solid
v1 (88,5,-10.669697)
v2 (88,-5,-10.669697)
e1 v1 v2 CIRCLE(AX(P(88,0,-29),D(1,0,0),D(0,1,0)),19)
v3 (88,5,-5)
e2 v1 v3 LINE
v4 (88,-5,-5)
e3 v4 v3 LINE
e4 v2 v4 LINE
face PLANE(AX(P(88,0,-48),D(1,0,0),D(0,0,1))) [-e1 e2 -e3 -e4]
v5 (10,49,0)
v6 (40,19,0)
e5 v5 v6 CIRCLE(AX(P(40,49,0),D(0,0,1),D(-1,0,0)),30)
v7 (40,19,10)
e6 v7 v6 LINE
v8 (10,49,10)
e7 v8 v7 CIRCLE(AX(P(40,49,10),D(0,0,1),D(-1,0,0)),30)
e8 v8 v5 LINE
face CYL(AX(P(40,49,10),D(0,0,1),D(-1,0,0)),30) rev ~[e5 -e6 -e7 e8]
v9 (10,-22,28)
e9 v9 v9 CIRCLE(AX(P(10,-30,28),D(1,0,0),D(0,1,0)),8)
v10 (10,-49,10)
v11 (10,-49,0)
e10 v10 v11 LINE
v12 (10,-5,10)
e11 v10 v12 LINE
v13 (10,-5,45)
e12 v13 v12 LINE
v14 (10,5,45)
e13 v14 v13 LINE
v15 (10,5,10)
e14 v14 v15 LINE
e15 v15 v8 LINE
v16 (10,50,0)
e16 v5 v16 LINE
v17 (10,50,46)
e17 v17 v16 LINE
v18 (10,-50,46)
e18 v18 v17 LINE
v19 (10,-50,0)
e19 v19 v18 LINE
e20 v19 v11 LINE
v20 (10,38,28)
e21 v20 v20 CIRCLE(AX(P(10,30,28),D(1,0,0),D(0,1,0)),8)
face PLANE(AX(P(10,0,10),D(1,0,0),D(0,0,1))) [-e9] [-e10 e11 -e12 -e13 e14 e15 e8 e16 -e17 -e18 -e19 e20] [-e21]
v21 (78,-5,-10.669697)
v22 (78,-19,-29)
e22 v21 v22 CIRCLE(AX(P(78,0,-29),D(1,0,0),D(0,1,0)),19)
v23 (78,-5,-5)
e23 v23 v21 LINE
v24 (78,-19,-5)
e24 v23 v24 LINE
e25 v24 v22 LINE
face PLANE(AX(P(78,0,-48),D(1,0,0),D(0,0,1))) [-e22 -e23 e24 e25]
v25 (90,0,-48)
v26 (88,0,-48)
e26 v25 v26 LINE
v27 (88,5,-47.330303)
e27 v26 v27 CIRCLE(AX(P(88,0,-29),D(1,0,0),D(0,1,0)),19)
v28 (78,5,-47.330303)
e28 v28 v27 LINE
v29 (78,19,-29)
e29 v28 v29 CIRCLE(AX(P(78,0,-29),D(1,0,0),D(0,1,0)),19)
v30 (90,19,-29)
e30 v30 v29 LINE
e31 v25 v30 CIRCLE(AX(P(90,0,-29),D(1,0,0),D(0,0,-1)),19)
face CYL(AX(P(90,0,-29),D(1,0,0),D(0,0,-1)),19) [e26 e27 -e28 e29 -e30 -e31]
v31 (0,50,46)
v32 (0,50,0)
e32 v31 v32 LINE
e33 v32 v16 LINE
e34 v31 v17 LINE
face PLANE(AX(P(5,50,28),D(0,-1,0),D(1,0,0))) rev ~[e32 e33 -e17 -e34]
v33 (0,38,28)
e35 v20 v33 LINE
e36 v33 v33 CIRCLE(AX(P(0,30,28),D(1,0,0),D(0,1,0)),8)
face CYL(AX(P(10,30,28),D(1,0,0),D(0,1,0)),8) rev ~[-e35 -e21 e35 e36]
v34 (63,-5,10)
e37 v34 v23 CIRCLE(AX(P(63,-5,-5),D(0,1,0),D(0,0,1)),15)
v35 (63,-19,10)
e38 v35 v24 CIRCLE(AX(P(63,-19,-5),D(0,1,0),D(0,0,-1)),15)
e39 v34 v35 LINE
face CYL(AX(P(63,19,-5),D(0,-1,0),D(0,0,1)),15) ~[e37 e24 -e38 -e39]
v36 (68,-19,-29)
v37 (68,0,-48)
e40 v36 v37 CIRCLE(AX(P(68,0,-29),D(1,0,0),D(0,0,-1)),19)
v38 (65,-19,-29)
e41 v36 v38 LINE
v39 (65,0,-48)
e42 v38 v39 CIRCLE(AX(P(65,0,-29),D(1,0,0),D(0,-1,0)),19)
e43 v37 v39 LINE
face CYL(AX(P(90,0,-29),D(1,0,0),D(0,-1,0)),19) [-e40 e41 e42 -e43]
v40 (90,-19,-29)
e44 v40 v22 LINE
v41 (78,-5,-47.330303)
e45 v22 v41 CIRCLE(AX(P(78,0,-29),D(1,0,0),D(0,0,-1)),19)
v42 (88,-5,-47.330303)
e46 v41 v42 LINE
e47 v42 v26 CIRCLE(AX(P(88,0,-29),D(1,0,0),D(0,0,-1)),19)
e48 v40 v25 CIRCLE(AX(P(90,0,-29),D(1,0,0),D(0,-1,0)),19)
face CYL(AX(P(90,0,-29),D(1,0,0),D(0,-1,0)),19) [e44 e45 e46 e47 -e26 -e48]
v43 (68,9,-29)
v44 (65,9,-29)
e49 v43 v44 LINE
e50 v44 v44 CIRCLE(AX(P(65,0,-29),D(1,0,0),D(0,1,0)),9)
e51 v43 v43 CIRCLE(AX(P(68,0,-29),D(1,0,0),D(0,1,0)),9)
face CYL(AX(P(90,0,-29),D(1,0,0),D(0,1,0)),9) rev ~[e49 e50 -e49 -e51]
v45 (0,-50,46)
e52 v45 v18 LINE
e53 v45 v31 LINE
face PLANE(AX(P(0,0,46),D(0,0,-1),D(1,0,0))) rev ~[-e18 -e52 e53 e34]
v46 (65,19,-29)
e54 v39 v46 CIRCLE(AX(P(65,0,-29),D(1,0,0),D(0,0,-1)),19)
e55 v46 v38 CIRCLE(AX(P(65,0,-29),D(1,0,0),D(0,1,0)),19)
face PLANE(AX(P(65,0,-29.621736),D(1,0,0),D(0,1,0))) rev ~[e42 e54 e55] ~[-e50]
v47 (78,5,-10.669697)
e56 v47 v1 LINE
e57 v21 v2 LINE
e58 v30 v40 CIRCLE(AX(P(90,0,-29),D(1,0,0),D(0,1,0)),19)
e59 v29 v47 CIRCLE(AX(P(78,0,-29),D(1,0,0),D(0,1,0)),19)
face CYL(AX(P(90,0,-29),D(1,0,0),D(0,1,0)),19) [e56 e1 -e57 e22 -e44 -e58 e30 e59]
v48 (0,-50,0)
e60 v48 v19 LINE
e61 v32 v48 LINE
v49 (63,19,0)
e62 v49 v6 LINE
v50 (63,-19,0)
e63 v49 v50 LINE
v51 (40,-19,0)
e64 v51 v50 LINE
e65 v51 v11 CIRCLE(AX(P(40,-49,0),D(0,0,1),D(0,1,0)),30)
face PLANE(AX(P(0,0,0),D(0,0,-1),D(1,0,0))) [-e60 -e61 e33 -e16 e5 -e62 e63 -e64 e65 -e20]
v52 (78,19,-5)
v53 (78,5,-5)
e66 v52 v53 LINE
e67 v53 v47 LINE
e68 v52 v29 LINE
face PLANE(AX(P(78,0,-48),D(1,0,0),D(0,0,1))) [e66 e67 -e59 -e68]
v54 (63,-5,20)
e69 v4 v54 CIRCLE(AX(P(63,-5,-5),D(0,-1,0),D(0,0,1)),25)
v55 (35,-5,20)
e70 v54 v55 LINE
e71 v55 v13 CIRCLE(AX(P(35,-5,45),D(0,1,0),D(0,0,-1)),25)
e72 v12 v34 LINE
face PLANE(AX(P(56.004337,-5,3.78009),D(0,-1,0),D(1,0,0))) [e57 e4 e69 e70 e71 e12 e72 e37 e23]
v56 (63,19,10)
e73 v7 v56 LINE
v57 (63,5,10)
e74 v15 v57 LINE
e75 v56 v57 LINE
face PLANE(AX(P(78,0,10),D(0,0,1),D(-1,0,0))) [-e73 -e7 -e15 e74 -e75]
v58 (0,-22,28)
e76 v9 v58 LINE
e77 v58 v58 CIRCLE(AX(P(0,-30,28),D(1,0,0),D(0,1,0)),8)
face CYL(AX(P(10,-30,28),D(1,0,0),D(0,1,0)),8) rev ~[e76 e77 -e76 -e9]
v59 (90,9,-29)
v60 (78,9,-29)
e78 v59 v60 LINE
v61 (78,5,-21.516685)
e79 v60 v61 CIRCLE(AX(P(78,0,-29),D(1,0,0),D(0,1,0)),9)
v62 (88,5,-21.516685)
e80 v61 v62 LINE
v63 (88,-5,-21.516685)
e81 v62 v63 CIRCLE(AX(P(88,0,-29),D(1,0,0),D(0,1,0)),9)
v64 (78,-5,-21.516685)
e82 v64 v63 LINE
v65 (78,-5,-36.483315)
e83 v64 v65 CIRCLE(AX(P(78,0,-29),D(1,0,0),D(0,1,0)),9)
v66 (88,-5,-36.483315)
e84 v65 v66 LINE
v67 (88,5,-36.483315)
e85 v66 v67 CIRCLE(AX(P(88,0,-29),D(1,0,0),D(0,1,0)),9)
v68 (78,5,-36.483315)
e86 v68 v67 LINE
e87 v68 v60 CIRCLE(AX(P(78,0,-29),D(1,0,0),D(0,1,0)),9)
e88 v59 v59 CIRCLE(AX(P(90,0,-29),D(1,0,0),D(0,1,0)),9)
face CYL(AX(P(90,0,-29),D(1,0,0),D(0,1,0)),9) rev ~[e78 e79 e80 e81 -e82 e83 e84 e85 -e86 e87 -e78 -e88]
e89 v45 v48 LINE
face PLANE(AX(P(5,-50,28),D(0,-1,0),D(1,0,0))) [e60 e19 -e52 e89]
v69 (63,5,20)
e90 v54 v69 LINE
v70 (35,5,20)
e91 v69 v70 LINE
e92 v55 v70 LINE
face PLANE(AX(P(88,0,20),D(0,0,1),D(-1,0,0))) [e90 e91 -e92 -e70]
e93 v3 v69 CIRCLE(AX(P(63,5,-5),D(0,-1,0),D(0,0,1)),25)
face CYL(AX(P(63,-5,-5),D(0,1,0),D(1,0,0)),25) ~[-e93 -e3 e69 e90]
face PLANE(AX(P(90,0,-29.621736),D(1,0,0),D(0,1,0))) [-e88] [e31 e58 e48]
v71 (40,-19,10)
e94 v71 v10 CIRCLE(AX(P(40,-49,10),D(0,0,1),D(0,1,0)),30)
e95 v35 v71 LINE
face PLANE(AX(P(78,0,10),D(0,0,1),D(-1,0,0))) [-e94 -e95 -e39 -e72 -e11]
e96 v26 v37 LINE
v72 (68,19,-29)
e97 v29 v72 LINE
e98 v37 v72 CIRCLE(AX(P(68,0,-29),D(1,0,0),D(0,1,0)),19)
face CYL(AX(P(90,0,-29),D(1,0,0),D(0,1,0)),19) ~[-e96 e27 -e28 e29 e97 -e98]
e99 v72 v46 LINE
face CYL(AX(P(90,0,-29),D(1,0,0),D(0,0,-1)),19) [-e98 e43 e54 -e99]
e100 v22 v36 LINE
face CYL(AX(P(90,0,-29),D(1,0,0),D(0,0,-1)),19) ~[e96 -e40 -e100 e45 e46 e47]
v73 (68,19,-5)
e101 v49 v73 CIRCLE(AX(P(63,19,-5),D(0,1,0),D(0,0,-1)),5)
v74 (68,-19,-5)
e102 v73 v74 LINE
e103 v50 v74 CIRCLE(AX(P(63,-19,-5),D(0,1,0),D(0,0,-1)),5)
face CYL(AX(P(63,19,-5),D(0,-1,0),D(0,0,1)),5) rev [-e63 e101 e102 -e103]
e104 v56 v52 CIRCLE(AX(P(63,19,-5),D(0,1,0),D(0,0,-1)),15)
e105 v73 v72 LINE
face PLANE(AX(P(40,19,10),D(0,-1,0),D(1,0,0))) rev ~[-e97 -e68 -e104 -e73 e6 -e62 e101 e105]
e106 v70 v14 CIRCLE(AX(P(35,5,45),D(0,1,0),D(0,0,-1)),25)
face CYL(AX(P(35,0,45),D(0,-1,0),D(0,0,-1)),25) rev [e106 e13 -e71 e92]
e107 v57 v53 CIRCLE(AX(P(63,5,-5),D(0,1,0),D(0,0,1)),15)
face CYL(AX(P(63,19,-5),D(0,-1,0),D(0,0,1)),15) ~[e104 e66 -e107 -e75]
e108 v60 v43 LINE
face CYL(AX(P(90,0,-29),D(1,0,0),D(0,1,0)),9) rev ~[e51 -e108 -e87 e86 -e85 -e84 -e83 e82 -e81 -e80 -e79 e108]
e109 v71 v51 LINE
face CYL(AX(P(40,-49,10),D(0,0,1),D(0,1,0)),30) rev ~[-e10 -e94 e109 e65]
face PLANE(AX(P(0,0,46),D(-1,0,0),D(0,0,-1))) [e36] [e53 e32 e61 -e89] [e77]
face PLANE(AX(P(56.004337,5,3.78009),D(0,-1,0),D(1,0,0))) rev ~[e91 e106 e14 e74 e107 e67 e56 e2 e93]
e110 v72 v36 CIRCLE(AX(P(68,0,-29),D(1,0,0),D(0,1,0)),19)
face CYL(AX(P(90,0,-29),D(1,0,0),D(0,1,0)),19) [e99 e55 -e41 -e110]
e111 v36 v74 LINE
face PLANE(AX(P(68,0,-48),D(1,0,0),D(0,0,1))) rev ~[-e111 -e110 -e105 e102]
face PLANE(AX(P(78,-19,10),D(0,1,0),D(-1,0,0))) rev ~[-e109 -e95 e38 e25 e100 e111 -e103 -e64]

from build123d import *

# Parameters (mm, degrees)
F0_W      = 10
F0_H      = 36
F0_H_2    = 10
F0_W_2    = 58
F0_H_3    = 48
F1_DEPTH  = 50
F4_DEPTH  = 58.001
F2_R      = 8
F5_DEPTH  = 25
F6_R      = 15
F7_R      = 5
F9_DEPTH  = 5
F10_R     = 25
F13_DEPTH = 25
F12_R     = 9
F14_DEPTH = 25
F15_DEPTH = 25


# Not quite as in the source:
# - after a boolean that leaves OpenCascade's solid faulty, fix() repairs it


with BuildPart() as f1:
    # F0 (on Front) → F1 (new body, symmetric)
    with BuildSketch(Plane.XZ):
        with Locations((5, 28)):
            Rectangle(F0_W, F0_H)
        with Locations((5, 5)):
            Rectangle(F0_W, F0_H_2)
        with Locations((39, 5)):
            Rectangle(F0_W_2, F0_H_2)
        with Locations((73, 5)):
            Rectangle(F0_W, F0_H_2)
        with Locations((73, -24)):
            Rectangle(F0_W, F0_H_3)
    extrude(amount=F1_DEPTH, both=True)

    # F3 (on face) → F4 (cut, through all)
    with BuildSketch(Plane.XY.offset(10)):
        with BuildLine():
            Line((78, -19), (40, -19))
            ThreePointArc((40, -19), (18.7867965644, -27.7867965644), (10, -49))
            Line((10, -49), (10, -50))
            Line((10, -50), (78, -50))
            Line((78, -50), (78, -19))
        make_face()
        with BuildLine():
            ThreePointArc((10, 49), (18.7867965644, 27.7867965644), (40, 19))
            Line((40, 19), (78, 19))
            Line((78, 19), (78, 50))
            Line((78, 50), (10, 50))
            Line((10, 50), (10, 49))
        make_face()
    extrude(amount=-F4_DEPTH, mode=Mode.SUBTRACT)

    # F2 (on face) → F5 (cut)
    with BuildSketch(Plane.YZ.offset(10)):
        with Locations((30, 28)):
            Circle(F2_R)
        with Locations((-30, 28)):
            Circle(F2_R)
    extrude(amount=-F5_DEPTH, mode=Mode.SUBTRACT)

    # F6
    f6_edges = [f1.edges().sort_by_distance(p)[0] for p in [
        (78, 0, 10),
    ]]
    fillet(f6_edges, radius=F6_R)

    # F7
    f7_edges = [f1.edges().sort_by_distance(p)[0] for p in [
        (68, 0, 0),
    ]]
    fillet(f7_edges, radius=F7_R)

    # F8 (on Front) → F9 (join, symmetric)
    with BuildSketch(Plane.XZ):
        with BuildLine():
            ThreePointArc((35, 20), (17.3223304703, 27.3223304703), (10, 45))
            Line((10, 45), (10, 10))
            Line((10, 10), (40, 10))
            Line((40, 10), (63, 10))
            ThreePointArc((63, 10), (73.6066017178, 5.6066017178), (78, -5))
            Line((78, -5), (78, -48))
            Line((78, -48), (88, -48))
            Line((88, -48), (88, 20))
            Line((88, 20), (35, 20))
        make_face()
    extrude(amount=F9_DEPTH, both=True)

    # F10
    f10_edges = [f1.edges().sort_by_distance(p)[0] for p in [
        (88, 0, 20),
    ]]
    fillet(f10_edges, radius=F10_R)

    # F12 (on offset) → F13 (cut)
    with BuildSketch(Plane.YZ.offset(90)):
        with BuildLine():
            ThreePointArc((0, -48), (-13.4350288425, -42.4350288425), (-19, -29))
            Line((-19, -29), (-19, -48))
            Line((-19, -48), (-5, -48))
            Line((-5, -48), (0, -48))
        make_face()
        with BuildLine():
            Line((19, -48), (19, -29))
            ThreePointArc((19, -29), (13.4350288425, -42.4350288425), (0, -48))
            Line((0, -48), (5, -48))
            Line((5, -48), (19, -48))
        make_face()
    extrude(amount=-F13_DEPTH, mode=Mode.SUBTRACT)

    # F12 (on offset) → F14 (join)
    with BuildSketch(Plane.YZ.offset(90)):
        with BuildLine():
            ThreePointArc((0, -48), (13.4350288425, -42.4350288425), (19, -29))
            ThreePointArc((19, -29), (0, -10), (-19, -29))
            ThreePointArc((-19, -29), (-13.4350288425, -42.4350288425), (0, -48))
        make_face()
        with Locations((0, -29)):
            Circle(F12_R, mode=Mode.SUBTRACT)
    extrude(amount=-F14_DEPTH)

    add(f1.part.fix(), mode=Mode.REPLACE)

    # F12 (on offset) → F15 (cut)
    with BuildSketch(Plane.YZ.offset(90)):
        with Locations((0, -29)):
            Circle(F12_R)
    extrude(amount=-F15_DEPTH, mode=Mode.SUBTRACT)


solid = f1.part
